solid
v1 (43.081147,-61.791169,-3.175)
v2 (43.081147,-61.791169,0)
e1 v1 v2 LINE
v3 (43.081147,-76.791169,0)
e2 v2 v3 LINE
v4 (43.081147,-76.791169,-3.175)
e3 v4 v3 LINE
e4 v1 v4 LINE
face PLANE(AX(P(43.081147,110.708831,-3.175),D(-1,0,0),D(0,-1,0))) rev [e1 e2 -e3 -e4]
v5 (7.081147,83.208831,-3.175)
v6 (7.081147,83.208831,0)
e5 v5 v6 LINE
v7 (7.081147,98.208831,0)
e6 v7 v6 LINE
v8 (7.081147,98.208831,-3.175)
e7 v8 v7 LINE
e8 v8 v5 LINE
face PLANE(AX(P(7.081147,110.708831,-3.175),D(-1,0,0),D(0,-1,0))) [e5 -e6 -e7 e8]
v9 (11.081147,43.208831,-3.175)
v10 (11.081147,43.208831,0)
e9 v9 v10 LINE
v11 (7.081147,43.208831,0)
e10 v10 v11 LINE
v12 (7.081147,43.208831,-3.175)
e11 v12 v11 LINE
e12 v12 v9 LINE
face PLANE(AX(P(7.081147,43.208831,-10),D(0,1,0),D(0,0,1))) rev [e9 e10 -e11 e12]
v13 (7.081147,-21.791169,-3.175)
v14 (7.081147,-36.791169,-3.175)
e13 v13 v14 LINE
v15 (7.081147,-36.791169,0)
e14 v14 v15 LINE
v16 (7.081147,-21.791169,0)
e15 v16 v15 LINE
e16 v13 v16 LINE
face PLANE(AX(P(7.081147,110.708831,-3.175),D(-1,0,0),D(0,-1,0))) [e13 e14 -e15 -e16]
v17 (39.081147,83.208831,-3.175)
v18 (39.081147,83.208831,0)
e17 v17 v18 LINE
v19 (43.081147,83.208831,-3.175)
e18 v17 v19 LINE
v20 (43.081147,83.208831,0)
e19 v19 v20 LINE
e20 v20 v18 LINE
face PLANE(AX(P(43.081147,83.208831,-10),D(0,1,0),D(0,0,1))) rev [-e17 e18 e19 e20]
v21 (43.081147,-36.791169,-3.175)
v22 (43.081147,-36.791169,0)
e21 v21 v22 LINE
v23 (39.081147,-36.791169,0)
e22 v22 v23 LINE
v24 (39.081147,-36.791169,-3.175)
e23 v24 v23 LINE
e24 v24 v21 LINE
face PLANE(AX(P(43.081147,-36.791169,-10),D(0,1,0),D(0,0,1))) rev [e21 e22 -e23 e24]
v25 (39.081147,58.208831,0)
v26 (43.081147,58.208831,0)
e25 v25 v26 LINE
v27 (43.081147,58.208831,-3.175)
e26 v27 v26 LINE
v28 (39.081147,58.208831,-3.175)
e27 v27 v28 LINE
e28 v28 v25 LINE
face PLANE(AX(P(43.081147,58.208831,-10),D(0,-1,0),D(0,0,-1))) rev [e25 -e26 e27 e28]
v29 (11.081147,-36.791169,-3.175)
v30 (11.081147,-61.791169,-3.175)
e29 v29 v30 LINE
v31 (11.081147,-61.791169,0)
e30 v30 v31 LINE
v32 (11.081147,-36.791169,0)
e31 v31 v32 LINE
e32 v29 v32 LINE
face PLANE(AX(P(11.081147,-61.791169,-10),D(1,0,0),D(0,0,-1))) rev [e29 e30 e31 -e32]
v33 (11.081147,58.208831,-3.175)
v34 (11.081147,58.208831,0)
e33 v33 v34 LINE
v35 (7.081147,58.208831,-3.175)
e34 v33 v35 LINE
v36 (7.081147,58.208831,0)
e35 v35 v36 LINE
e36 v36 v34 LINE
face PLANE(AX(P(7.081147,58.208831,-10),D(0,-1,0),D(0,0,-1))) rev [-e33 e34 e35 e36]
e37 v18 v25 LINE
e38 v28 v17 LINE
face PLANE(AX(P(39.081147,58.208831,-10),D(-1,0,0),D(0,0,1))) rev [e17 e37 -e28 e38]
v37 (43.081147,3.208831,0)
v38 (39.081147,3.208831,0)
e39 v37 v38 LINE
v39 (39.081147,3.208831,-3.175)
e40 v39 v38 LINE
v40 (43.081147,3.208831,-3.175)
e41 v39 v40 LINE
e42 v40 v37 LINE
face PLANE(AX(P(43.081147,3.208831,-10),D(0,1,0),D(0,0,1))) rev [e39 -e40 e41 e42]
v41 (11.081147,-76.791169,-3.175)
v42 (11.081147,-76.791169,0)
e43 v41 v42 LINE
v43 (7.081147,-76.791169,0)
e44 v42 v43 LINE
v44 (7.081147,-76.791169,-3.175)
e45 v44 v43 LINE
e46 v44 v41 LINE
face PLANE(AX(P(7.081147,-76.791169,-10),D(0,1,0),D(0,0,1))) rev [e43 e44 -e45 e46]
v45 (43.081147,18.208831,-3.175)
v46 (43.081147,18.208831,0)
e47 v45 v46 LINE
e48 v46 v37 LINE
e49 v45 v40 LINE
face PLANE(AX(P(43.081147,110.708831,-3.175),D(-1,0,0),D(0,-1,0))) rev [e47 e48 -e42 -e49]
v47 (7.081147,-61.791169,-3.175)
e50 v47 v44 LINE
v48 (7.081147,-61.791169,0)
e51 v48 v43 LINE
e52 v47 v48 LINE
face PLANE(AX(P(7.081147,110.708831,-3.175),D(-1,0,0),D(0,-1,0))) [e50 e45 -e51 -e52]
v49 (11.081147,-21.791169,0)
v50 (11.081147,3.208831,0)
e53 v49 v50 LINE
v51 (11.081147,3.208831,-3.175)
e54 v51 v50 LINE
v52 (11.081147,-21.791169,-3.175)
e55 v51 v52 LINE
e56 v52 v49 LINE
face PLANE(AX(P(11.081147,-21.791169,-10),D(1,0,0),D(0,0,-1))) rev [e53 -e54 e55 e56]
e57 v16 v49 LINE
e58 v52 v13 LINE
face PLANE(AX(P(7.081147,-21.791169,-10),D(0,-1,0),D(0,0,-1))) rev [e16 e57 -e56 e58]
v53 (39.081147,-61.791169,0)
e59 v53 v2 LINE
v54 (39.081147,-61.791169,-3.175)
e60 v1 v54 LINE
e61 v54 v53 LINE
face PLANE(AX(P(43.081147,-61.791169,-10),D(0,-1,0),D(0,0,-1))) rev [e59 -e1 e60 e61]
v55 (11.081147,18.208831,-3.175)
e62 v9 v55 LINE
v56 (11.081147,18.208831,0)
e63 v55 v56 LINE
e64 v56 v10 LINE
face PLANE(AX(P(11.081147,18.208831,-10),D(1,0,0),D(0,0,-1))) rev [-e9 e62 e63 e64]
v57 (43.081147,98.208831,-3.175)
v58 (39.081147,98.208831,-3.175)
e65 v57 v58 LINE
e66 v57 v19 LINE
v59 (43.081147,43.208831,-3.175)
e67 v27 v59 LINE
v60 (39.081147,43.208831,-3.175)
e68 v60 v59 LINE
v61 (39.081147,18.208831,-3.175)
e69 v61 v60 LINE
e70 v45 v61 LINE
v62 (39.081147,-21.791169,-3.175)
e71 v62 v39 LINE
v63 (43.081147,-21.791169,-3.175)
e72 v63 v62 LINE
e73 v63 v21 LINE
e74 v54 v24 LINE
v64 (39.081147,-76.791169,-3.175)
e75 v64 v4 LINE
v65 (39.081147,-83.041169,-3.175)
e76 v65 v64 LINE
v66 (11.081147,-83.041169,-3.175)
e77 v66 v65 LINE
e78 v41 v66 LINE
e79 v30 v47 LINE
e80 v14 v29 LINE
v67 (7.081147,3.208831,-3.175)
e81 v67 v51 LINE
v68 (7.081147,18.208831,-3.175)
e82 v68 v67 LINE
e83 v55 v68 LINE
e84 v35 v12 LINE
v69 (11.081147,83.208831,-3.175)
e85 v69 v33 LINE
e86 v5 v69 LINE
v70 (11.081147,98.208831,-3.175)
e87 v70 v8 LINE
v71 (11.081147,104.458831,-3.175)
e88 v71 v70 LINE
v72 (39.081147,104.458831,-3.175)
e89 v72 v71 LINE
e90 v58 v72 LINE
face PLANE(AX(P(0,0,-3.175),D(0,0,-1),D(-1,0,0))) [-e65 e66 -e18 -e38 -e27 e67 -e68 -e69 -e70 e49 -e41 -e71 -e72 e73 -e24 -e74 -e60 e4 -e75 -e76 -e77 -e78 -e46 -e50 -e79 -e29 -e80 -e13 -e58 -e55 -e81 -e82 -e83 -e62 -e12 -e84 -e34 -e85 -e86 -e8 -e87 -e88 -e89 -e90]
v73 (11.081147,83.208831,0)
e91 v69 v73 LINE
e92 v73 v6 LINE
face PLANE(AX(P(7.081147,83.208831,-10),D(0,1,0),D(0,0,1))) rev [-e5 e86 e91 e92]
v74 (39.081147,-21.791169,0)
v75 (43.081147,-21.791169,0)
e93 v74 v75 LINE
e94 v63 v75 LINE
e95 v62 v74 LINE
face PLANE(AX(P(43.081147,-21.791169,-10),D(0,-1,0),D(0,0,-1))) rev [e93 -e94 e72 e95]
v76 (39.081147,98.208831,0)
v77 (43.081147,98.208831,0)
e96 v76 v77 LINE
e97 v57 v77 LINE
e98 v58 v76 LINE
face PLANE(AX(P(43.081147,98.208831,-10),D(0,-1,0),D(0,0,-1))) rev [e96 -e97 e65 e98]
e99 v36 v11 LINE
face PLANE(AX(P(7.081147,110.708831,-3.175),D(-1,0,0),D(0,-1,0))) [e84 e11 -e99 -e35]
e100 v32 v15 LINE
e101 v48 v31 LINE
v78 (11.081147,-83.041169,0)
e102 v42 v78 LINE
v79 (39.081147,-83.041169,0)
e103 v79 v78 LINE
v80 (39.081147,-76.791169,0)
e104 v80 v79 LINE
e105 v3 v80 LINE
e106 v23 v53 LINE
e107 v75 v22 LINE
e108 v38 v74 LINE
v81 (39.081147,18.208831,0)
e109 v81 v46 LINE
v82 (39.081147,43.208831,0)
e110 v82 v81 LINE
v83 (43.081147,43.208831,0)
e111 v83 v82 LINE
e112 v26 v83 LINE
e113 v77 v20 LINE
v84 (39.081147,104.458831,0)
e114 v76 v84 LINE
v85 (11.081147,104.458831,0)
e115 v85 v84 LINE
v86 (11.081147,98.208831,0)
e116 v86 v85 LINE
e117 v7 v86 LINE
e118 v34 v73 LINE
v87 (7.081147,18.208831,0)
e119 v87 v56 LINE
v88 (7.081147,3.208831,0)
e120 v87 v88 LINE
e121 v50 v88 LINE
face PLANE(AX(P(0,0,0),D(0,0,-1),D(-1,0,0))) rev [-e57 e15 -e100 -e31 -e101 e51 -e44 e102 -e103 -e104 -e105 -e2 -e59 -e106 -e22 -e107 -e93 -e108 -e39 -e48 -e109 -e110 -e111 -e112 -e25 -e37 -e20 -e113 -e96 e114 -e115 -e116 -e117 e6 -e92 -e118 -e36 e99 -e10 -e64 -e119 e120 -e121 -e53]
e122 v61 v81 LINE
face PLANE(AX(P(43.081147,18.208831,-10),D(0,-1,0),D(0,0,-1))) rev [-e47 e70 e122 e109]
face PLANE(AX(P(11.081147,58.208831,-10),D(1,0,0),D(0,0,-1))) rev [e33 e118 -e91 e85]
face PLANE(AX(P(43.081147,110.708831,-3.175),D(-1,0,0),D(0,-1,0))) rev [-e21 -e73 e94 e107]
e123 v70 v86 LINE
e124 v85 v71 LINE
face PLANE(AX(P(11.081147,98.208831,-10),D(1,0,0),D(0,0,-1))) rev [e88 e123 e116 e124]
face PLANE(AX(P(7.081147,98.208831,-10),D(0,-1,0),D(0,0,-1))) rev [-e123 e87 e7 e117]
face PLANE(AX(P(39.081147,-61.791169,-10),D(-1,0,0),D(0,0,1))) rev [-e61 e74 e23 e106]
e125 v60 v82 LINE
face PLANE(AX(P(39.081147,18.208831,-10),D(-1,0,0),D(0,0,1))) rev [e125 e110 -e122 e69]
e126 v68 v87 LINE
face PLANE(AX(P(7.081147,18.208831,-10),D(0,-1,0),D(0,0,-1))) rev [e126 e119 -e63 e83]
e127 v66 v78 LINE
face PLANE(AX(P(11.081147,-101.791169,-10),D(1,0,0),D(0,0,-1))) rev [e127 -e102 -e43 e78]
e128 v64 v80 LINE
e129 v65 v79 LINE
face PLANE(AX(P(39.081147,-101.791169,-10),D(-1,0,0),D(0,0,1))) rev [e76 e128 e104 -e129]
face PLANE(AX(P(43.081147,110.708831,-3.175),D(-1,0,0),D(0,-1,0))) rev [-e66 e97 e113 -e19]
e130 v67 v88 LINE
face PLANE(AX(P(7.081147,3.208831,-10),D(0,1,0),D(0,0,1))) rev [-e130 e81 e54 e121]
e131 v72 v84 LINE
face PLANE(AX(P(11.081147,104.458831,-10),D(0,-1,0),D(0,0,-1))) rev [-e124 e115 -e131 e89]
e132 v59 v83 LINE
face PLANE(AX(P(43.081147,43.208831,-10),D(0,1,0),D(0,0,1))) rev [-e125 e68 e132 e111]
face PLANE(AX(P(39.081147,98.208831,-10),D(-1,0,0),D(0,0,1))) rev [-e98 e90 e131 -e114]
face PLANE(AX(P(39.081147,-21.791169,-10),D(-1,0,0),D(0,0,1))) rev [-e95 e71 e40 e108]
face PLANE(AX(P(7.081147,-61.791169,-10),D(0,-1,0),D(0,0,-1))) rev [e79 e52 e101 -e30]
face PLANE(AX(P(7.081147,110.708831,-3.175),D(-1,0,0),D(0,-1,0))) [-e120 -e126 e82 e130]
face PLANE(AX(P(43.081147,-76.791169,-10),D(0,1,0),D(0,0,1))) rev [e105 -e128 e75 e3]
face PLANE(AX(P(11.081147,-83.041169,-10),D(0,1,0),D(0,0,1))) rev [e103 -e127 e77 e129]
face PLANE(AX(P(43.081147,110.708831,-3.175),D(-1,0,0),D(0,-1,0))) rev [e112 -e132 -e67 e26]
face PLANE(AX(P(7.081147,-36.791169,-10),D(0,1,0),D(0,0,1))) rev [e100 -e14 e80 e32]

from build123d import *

# Parameters (mm, degrees)
SKETCH1_W          = 36
SKETCH1_H          = 200
BASE_FLANGE1_DEPTH = 3.175
SKETCH2_W          = 4
SKETCH2_H          = 25
CUT_EXTRUDE1_DEPTH = 10
LPATTERN1_COUNT    = 6
LPATTERN1_PITCH    = 40
SKETCH3_W          = 28
SKETCH3_H          = 6.25
CUT_EXTRUDE2_DEPTH = 10


# Sheet-metal steps are written as plain solids
with BuildPart() as part:
    # Sketch1 → Base-Flange1 (new body)
    with BuildSketch(Plane.XY):
        with Locations((25.081146731, 10.708830738)):
            Rectangle(SKETCH1_W, SKETCH1_H)
    extrude(amount=-BASE_FLANGE1_DEPTH)

    # Sketch2 → Cut-Extrude1 (cut)
    with BuildSketch(Plane.XY):
        with Locations((9.081146731, -89.291169262)):
            Rectangle(SKETCH2_W, SKETCH2_H)
        with Locations((41.081146731, -89.291169262)):
            Rectangle(SKETCH2_W, SKETCH2_H)
    cut_extrude1 = extrude(amount=-CUT_EXTRUDE1_DEPTH, mode=Mode.SUBTRACT)

    # LPattern1: Cut-Extrude1 ×6
    with Locations(*[(0, i * LPATTERN1_PITCH, 0) for i in range(1, LPATTERN1_COUNT)]):
        add(cut_extrude1, mode=Mode.SUBTRACT)

    # Sketch3 → Cut-Extrude2 (cut)
    with BuildSketch(Plane.XY):
        with Locations((25.081146731, 107.583830738)):
            Rectangle(SKETCH3_W, SKETCH3_H)
        with Locations((25.081146731, -86.166169262)):
            Rectangle(SKETCH3_W, SKETCH3_H)
    extrude(amount=-CUT_EXTRUDE2_DEPTH, mode=Mode.SUBTRACT)


solid = part.part
